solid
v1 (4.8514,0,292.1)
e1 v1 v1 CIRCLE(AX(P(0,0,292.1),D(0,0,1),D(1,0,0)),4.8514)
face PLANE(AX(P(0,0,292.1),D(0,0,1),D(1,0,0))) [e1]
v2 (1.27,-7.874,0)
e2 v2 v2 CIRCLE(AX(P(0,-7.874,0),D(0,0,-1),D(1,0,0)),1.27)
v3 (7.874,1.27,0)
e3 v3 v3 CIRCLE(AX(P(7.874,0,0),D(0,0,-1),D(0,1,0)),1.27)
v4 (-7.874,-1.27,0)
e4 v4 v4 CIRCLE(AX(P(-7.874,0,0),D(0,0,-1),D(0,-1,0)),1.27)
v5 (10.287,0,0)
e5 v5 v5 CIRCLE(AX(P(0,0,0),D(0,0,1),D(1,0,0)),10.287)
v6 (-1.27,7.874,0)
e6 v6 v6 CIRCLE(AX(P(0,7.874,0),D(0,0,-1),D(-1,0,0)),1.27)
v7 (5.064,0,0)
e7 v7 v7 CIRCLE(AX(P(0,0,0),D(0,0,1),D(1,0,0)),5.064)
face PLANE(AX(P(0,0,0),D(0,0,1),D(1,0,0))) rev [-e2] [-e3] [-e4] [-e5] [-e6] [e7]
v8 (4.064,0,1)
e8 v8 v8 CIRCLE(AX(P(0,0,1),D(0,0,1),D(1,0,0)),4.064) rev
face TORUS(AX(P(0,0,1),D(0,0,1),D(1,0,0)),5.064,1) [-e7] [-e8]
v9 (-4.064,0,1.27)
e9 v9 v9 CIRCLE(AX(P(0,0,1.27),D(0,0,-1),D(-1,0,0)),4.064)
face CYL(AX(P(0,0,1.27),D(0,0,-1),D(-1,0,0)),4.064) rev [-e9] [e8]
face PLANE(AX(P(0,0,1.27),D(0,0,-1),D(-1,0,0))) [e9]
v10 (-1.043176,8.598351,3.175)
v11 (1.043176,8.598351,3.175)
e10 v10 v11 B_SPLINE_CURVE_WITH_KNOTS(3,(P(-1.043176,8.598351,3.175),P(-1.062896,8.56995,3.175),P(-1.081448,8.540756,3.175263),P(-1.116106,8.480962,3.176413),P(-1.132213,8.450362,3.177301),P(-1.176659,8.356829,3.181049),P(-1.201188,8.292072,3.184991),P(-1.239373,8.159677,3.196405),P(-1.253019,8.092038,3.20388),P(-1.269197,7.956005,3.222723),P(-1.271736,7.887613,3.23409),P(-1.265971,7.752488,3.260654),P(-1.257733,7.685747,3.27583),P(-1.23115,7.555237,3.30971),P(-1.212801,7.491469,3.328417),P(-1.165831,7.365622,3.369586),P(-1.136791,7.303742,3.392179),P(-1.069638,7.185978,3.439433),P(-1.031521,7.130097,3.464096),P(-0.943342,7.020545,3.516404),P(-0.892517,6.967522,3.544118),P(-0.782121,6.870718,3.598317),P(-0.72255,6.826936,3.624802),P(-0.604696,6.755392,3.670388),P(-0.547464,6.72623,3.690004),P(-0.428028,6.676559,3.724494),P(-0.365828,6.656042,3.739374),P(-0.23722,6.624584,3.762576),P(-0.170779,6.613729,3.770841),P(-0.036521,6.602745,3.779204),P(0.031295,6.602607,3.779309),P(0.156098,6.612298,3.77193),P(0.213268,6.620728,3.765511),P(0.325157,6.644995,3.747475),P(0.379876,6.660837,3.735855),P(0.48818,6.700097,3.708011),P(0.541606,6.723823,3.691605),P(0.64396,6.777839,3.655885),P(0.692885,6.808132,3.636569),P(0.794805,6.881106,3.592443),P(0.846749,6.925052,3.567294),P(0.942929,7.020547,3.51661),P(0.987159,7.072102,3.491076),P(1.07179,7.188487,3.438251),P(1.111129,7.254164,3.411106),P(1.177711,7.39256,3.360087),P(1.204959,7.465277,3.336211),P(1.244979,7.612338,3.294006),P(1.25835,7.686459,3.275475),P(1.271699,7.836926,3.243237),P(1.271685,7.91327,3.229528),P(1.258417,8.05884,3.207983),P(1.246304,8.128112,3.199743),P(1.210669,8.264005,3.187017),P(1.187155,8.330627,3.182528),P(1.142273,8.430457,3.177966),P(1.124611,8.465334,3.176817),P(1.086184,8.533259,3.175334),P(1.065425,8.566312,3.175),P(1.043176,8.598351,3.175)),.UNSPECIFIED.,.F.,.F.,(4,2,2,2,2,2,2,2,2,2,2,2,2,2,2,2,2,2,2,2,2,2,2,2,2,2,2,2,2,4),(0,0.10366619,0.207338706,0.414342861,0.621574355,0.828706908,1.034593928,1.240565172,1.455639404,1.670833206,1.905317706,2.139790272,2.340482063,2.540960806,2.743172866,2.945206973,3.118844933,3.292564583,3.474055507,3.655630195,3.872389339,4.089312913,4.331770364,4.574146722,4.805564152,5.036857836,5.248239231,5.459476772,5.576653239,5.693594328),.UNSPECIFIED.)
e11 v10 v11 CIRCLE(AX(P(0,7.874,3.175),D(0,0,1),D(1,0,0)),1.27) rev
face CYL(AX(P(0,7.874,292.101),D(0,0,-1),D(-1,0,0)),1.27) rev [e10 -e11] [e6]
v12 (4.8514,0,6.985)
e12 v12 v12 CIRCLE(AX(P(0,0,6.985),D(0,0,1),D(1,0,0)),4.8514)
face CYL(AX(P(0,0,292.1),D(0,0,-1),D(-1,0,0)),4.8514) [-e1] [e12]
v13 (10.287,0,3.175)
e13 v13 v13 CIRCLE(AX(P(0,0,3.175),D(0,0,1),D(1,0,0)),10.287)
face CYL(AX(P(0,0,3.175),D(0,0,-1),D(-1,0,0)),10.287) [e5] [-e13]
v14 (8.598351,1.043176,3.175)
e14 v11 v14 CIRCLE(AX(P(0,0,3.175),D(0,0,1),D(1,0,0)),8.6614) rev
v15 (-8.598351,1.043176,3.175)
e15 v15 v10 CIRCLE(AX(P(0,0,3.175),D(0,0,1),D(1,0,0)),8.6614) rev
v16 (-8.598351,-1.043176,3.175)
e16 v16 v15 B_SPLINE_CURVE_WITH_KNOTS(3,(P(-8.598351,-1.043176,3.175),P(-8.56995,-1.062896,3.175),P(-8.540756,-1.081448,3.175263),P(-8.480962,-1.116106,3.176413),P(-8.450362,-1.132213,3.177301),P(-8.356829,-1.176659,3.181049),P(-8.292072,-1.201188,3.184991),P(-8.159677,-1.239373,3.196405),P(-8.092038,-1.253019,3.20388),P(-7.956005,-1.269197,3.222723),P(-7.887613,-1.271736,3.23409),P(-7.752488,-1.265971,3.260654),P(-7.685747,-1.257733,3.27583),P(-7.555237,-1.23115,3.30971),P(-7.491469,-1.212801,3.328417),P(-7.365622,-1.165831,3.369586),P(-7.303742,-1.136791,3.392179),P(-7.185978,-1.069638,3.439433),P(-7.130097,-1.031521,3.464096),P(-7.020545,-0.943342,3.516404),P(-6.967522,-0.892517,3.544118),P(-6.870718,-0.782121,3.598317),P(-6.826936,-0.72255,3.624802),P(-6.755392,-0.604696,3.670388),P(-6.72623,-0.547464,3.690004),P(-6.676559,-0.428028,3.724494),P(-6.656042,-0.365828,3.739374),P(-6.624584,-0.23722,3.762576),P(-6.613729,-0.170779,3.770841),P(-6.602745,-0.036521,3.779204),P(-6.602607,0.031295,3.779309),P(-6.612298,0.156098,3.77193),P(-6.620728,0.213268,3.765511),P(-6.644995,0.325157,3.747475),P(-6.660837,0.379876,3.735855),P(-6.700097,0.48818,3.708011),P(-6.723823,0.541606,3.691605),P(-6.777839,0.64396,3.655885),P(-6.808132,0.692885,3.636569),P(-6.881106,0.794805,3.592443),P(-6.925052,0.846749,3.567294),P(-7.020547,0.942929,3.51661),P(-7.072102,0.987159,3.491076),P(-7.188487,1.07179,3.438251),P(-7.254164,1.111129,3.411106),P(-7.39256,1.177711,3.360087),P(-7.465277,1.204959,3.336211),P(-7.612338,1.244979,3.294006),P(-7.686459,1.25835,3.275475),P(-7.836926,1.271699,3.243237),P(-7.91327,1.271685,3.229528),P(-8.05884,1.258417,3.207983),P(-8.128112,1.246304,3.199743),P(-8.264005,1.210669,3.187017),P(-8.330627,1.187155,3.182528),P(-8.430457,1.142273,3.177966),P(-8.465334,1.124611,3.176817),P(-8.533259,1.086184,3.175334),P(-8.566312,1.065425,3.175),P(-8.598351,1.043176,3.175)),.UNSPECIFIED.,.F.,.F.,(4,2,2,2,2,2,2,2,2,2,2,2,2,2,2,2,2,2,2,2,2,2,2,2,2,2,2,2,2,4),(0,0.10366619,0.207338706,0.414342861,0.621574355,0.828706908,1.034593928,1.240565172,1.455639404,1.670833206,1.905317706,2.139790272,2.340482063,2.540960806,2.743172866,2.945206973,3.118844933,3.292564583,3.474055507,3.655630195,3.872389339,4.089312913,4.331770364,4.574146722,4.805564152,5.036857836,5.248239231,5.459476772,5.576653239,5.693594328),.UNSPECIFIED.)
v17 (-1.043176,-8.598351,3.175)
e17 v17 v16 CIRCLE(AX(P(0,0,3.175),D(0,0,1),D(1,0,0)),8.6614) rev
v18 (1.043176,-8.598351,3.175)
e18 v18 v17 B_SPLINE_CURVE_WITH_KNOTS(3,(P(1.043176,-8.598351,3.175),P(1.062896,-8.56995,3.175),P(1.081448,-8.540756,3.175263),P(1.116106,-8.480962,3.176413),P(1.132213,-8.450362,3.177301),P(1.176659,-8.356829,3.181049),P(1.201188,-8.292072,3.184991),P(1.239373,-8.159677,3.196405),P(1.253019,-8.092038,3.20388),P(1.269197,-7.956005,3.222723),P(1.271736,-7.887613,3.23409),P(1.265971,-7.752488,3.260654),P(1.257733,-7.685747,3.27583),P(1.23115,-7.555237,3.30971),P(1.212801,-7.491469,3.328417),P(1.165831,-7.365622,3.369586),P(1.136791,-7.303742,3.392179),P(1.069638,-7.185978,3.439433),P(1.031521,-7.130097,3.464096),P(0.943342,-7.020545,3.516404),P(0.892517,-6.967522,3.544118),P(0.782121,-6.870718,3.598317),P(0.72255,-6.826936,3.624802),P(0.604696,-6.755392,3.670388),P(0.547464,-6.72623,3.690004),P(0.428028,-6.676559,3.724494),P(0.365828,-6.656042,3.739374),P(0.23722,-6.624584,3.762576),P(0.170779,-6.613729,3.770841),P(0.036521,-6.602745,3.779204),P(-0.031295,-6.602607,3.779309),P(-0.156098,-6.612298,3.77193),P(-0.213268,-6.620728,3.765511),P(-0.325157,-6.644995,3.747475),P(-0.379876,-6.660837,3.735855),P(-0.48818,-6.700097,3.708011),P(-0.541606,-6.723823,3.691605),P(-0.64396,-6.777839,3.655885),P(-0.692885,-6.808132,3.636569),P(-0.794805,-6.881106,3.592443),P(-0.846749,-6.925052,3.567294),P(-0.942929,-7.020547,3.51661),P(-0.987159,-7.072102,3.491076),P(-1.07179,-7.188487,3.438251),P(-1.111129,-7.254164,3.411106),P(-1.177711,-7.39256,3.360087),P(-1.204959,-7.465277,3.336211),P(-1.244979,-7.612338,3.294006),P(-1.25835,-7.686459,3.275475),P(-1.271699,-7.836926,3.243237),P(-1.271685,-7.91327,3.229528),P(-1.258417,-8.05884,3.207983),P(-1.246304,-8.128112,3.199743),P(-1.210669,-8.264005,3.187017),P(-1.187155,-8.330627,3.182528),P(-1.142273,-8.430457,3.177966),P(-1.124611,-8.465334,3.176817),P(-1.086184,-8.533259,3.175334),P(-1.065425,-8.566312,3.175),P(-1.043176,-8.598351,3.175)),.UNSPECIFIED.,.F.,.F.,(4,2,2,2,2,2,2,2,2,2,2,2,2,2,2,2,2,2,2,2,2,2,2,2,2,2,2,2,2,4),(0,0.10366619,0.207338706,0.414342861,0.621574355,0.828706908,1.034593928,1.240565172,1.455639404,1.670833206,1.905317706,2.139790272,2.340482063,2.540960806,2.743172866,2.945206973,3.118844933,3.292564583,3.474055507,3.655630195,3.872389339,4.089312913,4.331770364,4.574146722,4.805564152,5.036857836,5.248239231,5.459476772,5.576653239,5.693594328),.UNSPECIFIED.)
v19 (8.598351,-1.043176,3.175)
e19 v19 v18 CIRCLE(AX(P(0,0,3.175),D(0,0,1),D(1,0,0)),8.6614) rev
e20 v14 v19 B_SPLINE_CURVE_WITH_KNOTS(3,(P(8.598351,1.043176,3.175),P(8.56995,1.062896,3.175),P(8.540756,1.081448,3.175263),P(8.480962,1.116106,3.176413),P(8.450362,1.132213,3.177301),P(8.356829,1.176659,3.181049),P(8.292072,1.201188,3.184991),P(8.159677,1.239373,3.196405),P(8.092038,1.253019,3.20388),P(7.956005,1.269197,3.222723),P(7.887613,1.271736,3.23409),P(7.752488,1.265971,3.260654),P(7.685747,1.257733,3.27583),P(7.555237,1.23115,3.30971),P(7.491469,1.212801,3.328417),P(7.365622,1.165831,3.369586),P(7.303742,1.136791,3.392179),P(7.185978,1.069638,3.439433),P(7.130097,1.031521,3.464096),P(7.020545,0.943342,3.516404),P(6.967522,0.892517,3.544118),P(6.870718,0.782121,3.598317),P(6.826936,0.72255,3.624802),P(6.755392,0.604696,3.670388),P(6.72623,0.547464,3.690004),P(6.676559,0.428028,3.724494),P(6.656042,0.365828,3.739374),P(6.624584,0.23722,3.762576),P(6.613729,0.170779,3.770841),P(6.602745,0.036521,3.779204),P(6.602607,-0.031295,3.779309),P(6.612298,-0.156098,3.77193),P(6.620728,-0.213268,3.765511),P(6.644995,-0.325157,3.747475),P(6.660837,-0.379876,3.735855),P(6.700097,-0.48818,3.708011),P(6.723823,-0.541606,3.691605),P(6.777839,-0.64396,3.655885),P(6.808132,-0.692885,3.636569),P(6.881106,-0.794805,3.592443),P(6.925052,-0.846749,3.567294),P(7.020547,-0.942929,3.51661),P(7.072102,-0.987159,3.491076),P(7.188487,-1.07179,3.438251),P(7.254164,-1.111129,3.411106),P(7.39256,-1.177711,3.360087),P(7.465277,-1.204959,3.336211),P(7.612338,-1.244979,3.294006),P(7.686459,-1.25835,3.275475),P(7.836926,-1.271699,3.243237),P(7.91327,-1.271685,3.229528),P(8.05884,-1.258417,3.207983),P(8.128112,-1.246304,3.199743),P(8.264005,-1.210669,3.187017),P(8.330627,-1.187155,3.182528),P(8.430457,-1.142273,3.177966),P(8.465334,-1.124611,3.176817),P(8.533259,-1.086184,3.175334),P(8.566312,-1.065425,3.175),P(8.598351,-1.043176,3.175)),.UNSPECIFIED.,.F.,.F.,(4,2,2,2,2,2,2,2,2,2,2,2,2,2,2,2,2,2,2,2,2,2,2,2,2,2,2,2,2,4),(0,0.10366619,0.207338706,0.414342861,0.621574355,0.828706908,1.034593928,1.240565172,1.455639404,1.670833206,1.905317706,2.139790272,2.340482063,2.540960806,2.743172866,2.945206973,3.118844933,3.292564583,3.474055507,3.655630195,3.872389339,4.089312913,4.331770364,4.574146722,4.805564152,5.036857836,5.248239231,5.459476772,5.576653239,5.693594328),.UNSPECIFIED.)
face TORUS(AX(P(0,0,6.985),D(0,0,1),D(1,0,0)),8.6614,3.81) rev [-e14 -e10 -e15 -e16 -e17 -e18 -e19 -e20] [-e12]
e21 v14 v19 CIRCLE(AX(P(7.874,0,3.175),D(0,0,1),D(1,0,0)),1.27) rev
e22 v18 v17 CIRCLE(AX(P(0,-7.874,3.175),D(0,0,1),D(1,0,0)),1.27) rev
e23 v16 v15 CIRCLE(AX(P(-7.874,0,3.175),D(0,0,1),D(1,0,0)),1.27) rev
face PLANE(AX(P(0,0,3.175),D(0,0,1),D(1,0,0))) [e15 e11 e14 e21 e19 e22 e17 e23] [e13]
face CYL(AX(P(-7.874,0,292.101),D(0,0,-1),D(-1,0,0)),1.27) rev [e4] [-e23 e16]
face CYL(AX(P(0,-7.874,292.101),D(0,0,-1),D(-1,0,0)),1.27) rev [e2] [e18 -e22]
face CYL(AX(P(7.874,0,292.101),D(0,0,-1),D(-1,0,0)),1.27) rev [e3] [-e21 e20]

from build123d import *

# Parameters (mm, degrees)
SKETCH1_R           = 10.287
BOSS_EXTRUDE1_DEPTH = 3.175
SKETCH2_R           = 4.8514
BOSS_EXTRUDE2_DEPTH = 288.925
SKETCH3_R           = 4.064
CUT_EXTRUDE1_DEPTH  = 1.27
FILLET1_R           = 1.000000032
CUT_EXTRUDE2_REACH  = 294.462
SKETCH4_R           = 1.27
CIRPATTERN1_COUNT   = 4
FILLET2_R           = 3.81


with BuildPart() as part:
    # Sketch1 → Boss-Extrude1 (new body)
    with BuildSketch(Plane.XY):
        Circle(SKETCH1_R)
    extrude(amount=BOSS_EXTRUDE1_DEPTH)

    # Sketch2 → Boss-Extrude2 (add)
    with BuildSketch(Plane.XY.offset(3.175)):
        Circle(SKETCH2_R)
    extrude(amount=BOSS_EXTRUDE2_DEPTH)

    # Sketch3 → Cut-Extrude1 (cut)
    with BuildSketch(Plane(origin=(0, 0, 0), x_dir=(-1, 0, 0), z_dir=(0, 0, -1))):
        Circle(SKETCH3_R)
    extrude(amount=-CUT_EXTRUDE1_DEPTH, mode=Mode.SUBTRACT)

    # Fillet1
    fillet1_edges = [part.edges().sort_by_distance(p)[0] for p in [
        (4.064, 0, 0),
    ]]
    fillet(fillet1_edges, radius=FILLET1_R)

    # Sketch4 → Cut-Extrude2 (cut, up to next)
    with BuildSketch(Plane(origin=(0, 0, 0), x_dir=(-1, 0, 0), z_dir=(0, 0, -1)), mode=Mode.PRIVATE) as cut_extrude2_sk1:
        with Locations((0, 7.874)):
            Circle(SKETCH4_R)
    cut_extrude2_tool1 = extrude(cut_extrude2_sk1.sketch, amount=-CUT_EXTRUDE2_REACH, mode=Mode.PRIVATE) & part.part
    cut_extrude2 = cut_extrude2_tool1.solids().sort_by_distance((0, 7.874, 0))[0]
    add(cut_extrude2, mode=Mode.SUBTRACT)

    # CirPattern1: Cut-Extrude2 ×4 about axis
    cirpattern1_axis = Axis((0, 0, 0), (0, 0, 1))
    for i in range(1, CIRPATTERN1_COUNT):
        add(cut_extrude2.rotate(cirpattern1_axis, i * 360 / CIRPATTERN1_COUNT), mode=Mode.SUBTRACT)

    # Fillet2
    # the kernel refuses this fillet: 3.81 mm, written as the material it adds along each edge
    with BuildSketch(Plane(origin=(0, 0, 3.175), x_dir=(1, 0, 0), z_dir=(0, -1, 0))) as fillet2_piece_1_section:
        with BuildLine():
            CenterArc((4.8514 + FILLET2_R, FILLET2_R), FILLET2_R, 180, 90)
            Line((4.8514, FILLET2_R), (4.8514, 0))
            Line((4.8514, 0), (4.8514 + FILLET2_R, 0))
        make_face()
    fillet2_piece_1 = revolve(axis=Axis((0, 0, 3.175), (0, 0, 1)), mode=Mode.PRIVATE)
    fillet2_piece_1 = fillet2_piece_1 - Plane(origin=(-7.874, 0, 4.25520668), x_dir=(0, -1, 0), z_dir=(0, 0, -1)) * Cylinder(1.27, 35, mode=Mode.PRIVATE)
    fillet2_piece_1 = fillet2_piece_1 - Plane(origin=(0, -7.874, 4.25520668), x_dir=(1, 0, 0), z_dir=(0, 0, -1)) * Cylinder(1.27, 35, mode=Mode.PRIVATE)
    fillet2_piece_1 = fillet2_piece_1 - Plane(origin=(0, 7.874, 4.25520668), x_dir=(-1, 0, 0), z_dir=(0, 0, -1)) * Cylinder(1.27, 35, mode=Mode.PRIVATE)
    fillet2_piece_1 = fillet2_piece_1 - Plane(origin=(7.874, 0, 4.25520668), x_dir=(0, 1, 0), z_dir=(0, 0, -1)) * Cylinder(1.27, 35, mode=Mode.PRIVATE)
    add(fillet2_piece_1)


solid = part.part
